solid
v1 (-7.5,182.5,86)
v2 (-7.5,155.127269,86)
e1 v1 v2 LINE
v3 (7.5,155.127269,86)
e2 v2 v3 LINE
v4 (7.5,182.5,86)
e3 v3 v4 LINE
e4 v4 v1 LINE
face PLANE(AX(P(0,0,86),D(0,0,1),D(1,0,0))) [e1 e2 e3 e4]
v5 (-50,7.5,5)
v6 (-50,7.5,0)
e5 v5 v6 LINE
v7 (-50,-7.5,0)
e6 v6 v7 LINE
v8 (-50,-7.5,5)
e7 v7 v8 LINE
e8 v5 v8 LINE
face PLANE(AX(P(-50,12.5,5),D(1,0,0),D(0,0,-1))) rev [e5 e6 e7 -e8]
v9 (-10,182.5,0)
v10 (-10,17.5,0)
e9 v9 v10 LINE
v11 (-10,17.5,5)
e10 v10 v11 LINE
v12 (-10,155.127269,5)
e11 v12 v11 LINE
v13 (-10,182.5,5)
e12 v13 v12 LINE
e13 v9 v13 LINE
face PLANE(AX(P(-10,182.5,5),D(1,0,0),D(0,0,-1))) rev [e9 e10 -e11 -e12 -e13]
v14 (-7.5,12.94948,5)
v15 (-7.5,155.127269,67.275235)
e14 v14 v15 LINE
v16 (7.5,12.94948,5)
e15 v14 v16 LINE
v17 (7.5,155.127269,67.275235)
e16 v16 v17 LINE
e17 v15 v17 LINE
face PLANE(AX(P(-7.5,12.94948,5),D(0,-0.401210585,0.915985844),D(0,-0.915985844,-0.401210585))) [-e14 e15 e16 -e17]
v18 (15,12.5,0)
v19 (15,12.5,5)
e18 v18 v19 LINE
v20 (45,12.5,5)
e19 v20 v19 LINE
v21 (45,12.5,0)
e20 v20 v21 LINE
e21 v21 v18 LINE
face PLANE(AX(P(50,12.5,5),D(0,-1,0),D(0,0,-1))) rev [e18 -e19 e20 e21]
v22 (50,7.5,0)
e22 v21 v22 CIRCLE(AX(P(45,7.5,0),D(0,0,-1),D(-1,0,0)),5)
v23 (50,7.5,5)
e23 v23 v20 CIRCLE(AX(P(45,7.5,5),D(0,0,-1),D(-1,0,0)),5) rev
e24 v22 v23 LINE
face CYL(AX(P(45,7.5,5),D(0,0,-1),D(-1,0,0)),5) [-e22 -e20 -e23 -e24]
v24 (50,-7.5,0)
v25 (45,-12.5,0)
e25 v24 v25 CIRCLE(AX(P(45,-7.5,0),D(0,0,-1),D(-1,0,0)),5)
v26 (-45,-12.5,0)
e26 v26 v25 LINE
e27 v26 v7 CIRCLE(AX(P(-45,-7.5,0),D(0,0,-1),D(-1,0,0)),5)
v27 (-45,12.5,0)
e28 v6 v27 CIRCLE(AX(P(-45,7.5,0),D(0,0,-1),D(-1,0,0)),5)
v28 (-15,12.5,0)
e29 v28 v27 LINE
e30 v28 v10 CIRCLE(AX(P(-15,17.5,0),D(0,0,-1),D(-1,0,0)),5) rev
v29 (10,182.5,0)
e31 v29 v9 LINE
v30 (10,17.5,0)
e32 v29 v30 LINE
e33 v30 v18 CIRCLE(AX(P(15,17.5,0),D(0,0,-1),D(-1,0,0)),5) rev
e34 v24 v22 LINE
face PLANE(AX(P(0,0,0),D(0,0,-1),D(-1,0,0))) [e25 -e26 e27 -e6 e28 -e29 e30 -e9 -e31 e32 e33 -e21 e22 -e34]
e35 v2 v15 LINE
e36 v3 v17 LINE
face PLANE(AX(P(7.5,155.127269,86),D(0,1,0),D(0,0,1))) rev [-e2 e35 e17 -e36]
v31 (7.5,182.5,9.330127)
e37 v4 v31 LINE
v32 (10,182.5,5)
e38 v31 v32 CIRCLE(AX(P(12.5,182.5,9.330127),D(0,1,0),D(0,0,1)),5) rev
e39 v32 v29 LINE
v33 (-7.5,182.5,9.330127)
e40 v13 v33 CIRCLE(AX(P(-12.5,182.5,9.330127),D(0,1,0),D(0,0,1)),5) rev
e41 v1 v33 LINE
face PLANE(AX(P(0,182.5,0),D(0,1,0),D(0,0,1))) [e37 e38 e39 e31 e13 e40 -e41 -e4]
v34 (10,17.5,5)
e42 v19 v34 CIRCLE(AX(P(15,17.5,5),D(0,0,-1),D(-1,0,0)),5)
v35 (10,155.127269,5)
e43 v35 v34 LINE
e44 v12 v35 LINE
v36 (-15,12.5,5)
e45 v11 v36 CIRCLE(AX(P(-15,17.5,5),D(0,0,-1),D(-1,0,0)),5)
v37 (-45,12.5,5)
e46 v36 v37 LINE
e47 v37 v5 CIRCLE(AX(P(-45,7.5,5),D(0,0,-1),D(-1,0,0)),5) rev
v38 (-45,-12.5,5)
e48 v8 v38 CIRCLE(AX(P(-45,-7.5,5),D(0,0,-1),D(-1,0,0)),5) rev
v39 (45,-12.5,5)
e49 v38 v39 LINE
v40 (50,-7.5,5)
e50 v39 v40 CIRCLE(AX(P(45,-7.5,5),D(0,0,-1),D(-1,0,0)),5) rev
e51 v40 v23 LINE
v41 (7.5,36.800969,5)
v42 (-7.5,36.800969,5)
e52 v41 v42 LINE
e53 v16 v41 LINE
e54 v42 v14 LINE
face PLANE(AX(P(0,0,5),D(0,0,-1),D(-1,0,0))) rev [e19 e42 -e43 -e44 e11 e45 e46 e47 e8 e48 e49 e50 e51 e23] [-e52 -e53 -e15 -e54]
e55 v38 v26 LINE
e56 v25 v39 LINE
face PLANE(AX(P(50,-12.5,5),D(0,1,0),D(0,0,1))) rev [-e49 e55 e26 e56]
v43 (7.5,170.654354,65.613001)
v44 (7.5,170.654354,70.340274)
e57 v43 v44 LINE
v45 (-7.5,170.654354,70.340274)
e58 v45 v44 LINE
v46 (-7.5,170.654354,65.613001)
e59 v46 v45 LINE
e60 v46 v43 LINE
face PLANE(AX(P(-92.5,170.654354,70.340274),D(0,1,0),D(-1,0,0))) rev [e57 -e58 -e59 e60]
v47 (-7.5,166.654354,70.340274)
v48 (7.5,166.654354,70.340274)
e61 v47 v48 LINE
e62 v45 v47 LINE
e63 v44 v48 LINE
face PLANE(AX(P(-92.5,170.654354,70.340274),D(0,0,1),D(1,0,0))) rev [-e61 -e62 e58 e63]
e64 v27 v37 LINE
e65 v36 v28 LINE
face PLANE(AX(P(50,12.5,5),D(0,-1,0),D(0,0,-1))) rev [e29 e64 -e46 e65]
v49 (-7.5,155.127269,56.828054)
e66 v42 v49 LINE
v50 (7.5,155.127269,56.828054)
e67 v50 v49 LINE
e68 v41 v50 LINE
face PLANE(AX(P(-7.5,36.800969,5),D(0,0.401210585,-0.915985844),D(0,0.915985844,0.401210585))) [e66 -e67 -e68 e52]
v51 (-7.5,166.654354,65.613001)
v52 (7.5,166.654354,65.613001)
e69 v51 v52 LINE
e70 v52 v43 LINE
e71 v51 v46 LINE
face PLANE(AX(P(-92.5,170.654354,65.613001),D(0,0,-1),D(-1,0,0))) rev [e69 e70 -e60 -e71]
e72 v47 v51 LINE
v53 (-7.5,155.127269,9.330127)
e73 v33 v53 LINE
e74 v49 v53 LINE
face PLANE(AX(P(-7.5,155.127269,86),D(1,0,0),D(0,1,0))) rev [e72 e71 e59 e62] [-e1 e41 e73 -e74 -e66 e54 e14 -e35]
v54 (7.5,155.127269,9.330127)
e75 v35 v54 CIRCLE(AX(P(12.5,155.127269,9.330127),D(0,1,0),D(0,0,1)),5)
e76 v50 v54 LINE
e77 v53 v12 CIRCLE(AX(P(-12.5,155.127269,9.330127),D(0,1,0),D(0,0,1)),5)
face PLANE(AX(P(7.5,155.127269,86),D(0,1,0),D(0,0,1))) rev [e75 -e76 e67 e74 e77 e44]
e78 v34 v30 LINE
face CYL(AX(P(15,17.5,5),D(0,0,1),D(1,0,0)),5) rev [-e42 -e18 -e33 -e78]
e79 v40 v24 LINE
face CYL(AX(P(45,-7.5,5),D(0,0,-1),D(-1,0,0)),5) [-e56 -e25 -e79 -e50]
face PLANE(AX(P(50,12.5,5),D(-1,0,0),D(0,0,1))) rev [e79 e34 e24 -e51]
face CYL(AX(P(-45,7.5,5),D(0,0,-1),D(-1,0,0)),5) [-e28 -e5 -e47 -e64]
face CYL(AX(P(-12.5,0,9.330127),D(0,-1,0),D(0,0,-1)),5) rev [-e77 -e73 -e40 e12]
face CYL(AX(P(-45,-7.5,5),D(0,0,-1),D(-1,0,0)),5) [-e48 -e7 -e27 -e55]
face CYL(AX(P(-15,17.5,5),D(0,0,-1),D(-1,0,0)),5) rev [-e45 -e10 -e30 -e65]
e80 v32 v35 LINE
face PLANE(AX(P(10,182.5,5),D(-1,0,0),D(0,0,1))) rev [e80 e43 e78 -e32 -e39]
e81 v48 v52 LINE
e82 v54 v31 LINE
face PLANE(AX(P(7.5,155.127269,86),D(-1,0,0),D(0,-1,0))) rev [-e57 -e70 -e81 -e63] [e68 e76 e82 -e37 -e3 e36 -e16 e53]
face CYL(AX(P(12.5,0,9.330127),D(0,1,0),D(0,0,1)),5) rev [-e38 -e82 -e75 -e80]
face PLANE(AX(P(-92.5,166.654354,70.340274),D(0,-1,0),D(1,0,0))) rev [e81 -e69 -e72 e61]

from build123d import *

# Parameters (mm, degrees)
SKETCH_1_W          = 100
SKETCH_1_H          = 25
EXTRUDE_1_DEPTH     = 5
SKETCH_2_W          = 20
SKETCH_2_H          = 5
EXTRUDE_2_DEPTH     = 170
SKETCH_3_W          = 15
SKETCH_3_H          = 27.372730927
EXTRUDE_3_DEPTH     = 81
FILLET_1_R          = 5
SKETCH_6_W          = 15
SKETCH_6_H          = 23.851489588
FILLET_2_R          = 5
FILLET_3_R          = 5
SKETCH_5_W          = 4.727272728
SKETCH_5_H          = 4
CUT_EXTRUDE_3_DEPTH = 100


with BuildPart() as part:
    # 草图1 → 凸台-拉伸1 (new body)
    with BuildSketch(Plane.XY):
        Rectangle(SKETCH_1_W, SKETCH_1_H)
    extrude(amount=EXTRUDE_1_DEPTH)

    # 草图2 → 凸台-拉伸2 (add)
    with BuildSketch(Plane(origin=(0, 12.5, 0), x_dir=(1, 0, 0), z_dir=(0, 1, 0))):
        with Locations((0, -2.5)):
            Rectangle(SKETCH_2_W, SKETCH_2_H)
    extrude(amount=EXTRUDE_2_DEPTH)

    # 草图3 → 凸台-拉伸3 (add)
    with BuildSketch(Plane.XY.offset(5)):
        with Locations((0, 168.813634536)):
            Rectangle(SKETCH_3_W, SKETCH_3_H)
    extrude(amount=EXTRUDE_3_DEPTH)

    # 圆角1
    # the kernel refuses this fillet: 5 mm, written as the material it adds along each edge
    with BuildSketch(Plane(origin=(-7.5, 155.127269073, 5), x_dir=(-1, 0, 0), z_dir=(0, 1, 0)), Plane(origin=(7.5, 182.5, 5), x_dir=(1, 0, 0), z_dir=(0, -1, 0))) as fillet_1_piece_1:
        with BuildLine():
            CenterArc((5, 4.330127019), FILLET_1_R, 180, 60)
            Line((0, 4.330127019), (-0.1, 4.330127019))
            Line((-0.1, 4.330127019), (-0.1, 0))
            Line((-0.1, 0), (0, -0.1))
            ThreePointArc((0, -0.1), (1.25, -0.1), (2.45, -0.08660254))
            Line((2.45, -0.08660254), (2.5, 0))
        make_face()
    extrude(amount=27.372730927)

    # 扫描1: sweep along a path in 草图7
    with BuildLine(Plane(origin=(0, 0, 0), x_dir=(0, 0, -1), z_dir=(1, 0, 0))) as sweep_1_path:
        Line((-5, 24.875224673), (-67.976637777, 168.654354293))
    # 草图6 → 扫描1 (sweep)
    with BuildSketch(Plane.XY.offset(5)):
        with Locations((0, 24.875224673)):
            Rectangle(SKETCH_6_W, SKETCH_6_H)
    sweep(path=sweep_1_path.line)

    # 圆角2
    fillet_2_edges = [part.edges().sort_by_distance(p)[0] for p in [
        (-10, 12.5, 2.5),
        (10, 12.5, 2.5),
    ]]
    fillet(fillet_2_edges, radius=FILLET_2_R)

    # 圆角3
    fillet_3_edges = [part.edges().sort_by_distance(p)[0] for p in [
        (-50, 12.5, 2.5),
        (50, 12.5, 2.5),
        (50, -12.5, 2.5),
        (-50, -12.5, 2.5),
    ]]
    fillet(fillet_3_edges, radius=FILLET_3_R)

    # 草图5 → 切除-拉伸3 (cut)
    with BuildSketch(Plane(origin=(7.5, 0, 0), x_dir=(0, 0, -1), z_dir=(1, 0, 0))):
        with Locations((-67.976637777, 168.654354293)):
            Rectangle(SKETCH_5_W, SKETCH_5_H)
    extrude(amount=-CUT_EXTRUDE_3_DEPTH, mode=Mode.SUBTRACT)


solid = part.part
